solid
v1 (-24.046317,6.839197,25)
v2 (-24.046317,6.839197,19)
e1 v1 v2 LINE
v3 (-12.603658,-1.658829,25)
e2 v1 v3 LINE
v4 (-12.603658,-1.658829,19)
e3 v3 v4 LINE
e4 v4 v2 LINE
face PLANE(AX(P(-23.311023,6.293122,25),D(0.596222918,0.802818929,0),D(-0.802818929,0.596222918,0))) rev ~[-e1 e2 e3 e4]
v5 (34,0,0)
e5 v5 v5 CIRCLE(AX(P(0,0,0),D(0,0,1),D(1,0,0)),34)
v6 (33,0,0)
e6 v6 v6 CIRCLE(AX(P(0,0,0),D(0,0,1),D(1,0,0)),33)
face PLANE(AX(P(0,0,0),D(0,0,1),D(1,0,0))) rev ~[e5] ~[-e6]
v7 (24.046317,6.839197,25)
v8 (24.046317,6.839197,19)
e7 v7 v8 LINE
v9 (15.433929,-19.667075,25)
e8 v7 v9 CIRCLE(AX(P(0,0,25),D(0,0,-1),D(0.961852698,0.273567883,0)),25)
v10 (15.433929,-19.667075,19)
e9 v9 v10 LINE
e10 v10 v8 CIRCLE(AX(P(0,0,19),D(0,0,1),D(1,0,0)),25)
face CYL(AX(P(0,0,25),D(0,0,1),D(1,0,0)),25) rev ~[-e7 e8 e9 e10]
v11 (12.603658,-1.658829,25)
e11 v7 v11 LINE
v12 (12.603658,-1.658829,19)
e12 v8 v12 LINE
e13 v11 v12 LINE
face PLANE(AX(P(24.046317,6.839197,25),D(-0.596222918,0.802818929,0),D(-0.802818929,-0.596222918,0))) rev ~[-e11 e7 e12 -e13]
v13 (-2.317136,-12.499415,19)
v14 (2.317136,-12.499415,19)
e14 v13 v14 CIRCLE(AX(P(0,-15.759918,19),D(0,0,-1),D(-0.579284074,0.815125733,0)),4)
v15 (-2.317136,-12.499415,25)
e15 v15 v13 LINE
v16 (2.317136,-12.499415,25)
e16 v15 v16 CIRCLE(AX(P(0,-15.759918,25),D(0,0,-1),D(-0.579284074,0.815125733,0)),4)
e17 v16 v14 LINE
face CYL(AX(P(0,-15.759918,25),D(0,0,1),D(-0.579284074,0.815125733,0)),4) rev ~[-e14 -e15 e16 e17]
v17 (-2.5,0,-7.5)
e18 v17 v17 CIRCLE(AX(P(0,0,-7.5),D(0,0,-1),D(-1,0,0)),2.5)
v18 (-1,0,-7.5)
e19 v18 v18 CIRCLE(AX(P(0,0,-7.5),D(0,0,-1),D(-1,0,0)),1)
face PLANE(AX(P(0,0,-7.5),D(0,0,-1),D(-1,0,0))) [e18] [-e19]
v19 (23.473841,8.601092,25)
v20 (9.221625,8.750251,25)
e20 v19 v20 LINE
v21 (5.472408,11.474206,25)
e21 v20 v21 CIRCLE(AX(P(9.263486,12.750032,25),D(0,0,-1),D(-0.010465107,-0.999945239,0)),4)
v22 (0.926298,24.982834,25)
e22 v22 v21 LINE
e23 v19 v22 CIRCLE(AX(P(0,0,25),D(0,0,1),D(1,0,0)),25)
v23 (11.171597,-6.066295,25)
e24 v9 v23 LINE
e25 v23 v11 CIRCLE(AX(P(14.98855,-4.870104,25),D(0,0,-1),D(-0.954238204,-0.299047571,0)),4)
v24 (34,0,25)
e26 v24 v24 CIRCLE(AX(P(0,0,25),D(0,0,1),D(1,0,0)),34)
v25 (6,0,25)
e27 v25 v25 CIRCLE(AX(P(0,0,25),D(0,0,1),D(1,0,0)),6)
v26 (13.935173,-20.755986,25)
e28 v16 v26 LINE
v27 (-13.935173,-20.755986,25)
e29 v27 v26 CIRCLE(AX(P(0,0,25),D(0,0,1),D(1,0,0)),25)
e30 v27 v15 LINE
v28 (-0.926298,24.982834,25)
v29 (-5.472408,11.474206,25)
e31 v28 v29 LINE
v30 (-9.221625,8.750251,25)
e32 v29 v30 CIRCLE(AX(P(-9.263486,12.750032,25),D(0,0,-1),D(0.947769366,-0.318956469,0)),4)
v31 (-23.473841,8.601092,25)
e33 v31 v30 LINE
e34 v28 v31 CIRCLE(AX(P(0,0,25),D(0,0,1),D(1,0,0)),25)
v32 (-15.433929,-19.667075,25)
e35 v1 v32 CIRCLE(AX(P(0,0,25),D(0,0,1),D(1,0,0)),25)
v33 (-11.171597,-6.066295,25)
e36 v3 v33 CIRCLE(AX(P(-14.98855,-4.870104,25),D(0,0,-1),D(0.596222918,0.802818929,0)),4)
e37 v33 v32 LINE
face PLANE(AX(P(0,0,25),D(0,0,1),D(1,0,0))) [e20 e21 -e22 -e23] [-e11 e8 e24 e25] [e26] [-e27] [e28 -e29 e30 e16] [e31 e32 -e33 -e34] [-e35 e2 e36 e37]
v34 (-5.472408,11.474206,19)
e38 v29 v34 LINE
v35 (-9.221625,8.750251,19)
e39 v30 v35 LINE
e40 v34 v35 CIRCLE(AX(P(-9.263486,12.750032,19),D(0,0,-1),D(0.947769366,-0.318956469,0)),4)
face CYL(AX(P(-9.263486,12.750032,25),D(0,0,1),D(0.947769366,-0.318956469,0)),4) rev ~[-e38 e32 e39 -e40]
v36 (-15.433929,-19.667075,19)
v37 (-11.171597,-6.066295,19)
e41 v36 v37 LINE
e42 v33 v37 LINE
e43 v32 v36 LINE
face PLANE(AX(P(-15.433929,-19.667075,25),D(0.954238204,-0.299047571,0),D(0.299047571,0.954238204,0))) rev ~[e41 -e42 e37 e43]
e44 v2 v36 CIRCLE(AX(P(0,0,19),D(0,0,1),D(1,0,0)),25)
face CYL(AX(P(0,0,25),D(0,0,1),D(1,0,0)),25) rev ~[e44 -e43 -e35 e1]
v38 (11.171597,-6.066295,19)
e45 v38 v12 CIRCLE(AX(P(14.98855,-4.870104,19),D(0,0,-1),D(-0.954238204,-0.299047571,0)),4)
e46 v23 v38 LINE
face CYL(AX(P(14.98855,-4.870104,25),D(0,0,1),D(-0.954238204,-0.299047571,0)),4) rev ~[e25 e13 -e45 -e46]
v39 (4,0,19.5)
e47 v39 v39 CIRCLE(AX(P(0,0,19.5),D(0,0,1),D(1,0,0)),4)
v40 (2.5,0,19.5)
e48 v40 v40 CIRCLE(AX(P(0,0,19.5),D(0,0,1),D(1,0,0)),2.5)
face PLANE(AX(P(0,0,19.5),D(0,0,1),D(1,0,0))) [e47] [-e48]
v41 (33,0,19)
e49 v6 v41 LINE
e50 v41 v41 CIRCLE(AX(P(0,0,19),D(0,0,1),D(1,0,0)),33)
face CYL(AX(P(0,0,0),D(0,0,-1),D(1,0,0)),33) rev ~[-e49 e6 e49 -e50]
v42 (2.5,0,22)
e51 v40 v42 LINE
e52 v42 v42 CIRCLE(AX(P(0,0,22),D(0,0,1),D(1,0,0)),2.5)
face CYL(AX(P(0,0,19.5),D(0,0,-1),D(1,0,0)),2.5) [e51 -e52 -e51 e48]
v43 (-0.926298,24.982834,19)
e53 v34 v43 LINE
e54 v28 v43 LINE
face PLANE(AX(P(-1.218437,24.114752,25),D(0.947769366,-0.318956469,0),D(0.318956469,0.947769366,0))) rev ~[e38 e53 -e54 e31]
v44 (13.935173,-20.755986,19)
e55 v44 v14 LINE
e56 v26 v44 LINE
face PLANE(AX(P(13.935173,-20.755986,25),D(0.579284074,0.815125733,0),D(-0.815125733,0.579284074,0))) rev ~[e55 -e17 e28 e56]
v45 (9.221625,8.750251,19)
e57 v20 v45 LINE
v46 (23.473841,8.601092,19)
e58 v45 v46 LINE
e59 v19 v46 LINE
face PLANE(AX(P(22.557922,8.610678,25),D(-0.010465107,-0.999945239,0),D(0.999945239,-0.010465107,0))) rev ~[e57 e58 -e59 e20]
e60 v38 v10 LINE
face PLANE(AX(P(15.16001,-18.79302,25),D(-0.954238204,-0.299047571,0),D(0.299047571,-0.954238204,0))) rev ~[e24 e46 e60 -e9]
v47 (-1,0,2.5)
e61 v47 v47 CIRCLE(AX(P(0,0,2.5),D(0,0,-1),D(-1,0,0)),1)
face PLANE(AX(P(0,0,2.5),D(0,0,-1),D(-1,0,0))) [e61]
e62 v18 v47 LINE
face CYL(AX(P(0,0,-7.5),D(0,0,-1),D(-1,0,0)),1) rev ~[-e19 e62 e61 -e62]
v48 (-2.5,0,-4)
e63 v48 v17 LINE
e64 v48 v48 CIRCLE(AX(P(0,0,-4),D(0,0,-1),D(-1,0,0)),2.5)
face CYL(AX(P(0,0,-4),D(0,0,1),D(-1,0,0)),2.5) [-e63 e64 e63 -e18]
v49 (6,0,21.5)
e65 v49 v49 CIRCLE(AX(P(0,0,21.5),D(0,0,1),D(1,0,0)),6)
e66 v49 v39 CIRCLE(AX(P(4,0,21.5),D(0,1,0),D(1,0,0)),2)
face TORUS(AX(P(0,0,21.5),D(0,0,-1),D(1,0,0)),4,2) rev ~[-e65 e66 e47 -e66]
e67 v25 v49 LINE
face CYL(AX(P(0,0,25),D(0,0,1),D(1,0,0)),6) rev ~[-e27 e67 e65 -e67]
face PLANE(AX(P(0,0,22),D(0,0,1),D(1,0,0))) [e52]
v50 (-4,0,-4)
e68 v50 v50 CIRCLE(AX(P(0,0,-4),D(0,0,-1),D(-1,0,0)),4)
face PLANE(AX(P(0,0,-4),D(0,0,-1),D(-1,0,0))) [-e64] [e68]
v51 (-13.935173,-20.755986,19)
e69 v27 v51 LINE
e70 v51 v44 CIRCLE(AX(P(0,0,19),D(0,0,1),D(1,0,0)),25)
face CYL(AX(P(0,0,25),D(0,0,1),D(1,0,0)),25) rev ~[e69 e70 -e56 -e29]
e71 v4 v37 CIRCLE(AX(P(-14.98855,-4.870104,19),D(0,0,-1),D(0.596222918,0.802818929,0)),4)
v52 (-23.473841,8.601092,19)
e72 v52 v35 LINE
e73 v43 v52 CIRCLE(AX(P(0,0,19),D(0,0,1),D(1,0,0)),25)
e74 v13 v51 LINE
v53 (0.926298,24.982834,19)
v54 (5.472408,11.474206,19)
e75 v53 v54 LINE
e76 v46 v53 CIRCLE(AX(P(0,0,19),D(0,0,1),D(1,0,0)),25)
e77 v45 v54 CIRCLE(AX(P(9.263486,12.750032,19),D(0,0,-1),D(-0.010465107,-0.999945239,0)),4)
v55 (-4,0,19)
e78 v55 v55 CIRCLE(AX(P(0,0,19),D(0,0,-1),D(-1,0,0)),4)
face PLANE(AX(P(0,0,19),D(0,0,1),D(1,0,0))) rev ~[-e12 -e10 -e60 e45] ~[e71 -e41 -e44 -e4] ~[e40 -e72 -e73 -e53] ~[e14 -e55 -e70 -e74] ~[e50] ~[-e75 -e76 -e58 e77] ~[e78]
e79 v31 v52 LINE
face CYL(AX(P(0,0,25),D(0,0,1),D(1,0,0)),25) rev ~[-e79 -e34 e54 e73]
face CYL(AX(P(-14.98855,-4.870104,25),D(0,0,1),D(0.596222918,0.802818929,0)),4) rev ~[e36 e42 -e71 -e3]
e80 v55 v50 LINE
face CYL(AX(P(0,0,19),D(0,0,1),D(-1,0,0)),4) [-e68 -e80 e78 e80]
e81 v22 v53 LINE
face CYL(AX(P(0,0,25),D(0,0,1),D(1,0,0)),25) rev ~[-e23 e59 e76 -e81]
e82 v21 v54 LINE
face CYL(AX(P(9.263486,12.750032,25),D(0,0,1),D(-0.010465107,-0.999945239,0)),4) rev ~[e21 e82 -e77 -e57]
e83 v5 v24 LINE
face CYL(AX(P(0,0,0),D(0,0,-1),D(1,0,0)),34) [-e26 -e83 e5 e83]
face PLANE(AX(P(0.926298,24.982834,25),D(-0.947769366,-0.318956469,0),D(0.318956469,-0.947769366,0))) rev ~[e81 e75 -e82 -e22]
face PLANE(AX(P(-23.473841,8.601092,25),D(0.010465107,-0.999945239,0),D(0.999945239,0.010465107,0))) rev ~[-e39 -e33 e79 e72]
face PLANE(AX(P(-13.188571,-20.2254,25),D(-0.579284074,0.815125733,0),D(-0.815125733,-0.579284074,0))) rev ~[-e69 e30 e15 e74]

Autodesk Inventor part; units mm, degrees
ref_plane "YZ Plane" through (0, 0, 0) normal (1, 0, 0) x (0, 1, 0)
ref_plane "XZ Plane" through (0, 0, 0) normal (0, 1, 0) x (-1, 0, 0)
ref_plane "XY Plane" through (0, 0, 0) normal (0, 0, 1) x (1, 0, 0)
sketch "Эскиз1" plane through (0, 0, 0) normal (0, 0, 1) x (1, 0, 0)
  circle A0 centre (0, 0) radius 34
  circle A1 centre (0, 0) radius 33
  dimension "d0" = 68
  dimension "d1" = 66
extrude "Выдавливание1" add sketch "Эскиз1" along normal blind 25
sketch "Эскиз4" plane through (0, 0, 25) normal (0, 0, 1) x (1, 0, 0)
  circle A0 centre (0, 0) radius 33
extrude "Выдавливание2" add sketch "Эскиз4" against normal blind 6
sketch "Эскиз5" plane through (0, 0, 25) normal (0, 0, 1) x (1, 0, 0)
  circle A0 centre (0, 0) radius 25
  line L0 (0, 25) -> (23.7764, 7.7254)
  line L1 (23.7764, 7.7254) -> (14.6946, -20.2254)
  line L2 (14.6946, -20.2254) -> (-14.6946, -20.2254)
  line L3 (-14.6946, -20.2254) -> (-23.7764, 7.7254)
  line L4 (-23.7764, 7.7254) -> (0, 25)
  circle A1 centre (0, 0) radius 11
  line L5 (0, 25) -> (-4.9275, 9.8346)
  line L6 (0, 25) -> (4.9275, 9.8346)
  line L7 (23.7764, 7.7254) -> (7.8306, 7.7254)
  line L8 (23.7764, 7.7254) -> (10.876, -1.6473)
  line L9 (14.6946, -20.2254) -> (9.7671, -5.06)
  line L10 (14.6946, -20.2254) -> (1.7942, -10.8527)
  line L11 (-14.6946, -20.2254) -> (-1.7942, -10.8527)
  line L12 (-14.6946, -20.2254) -> (-9.7671, -5.06)
  line L13 (-7.8306, 7.7254) -> (-23.7764, 7.7254)
  line L14 (-10.876, -1.6473) -> (-23.7764, 7.7254)
  line L15 (4.9275, 9.8346) -> (9.7671, -5.06)
  line L16 (10.876, -1.6473) -> (-1.7942, -10.8527)
  line L17 (1.7942, -10.8527) -> (-10.876, -1.6473)
  line L18 (-9.7671, -5.06) -> (-4.9275, 9.8346)
  line L19 (-7.8306, 7.7254) -> (7.8306, 7.7254)
  line L20 (-7.8306, 7.7254) -> (-4.9275, 9.8346)
  line L21 (-6.3791, 8.78) -> (0, 27.7353)
  line L22 (4.9275, 9.8346) -> (7.8306, 7.7254)
  line L23 (10.876, -1.6473) -> (9.7671, -5.06)
  line L24 (1.7942, -10.8527) -> (-1.7942, -10.8527)
  line L25 (-9.7671, -5.06) -> (-10.876, -1.6473)
  line L26 (0, 27.7353) -> (6.3791, 8.78)
  line L27 (-10.3215, -3.3537) -> (-26.3778, 8.5707)
  line L28 (-26.3778, 8.5707) -> (-6.3791, 8.78)
  line L29 (0, -10.8527) -> (-16.3024, -22.4383)
  line L30 (-16.3024, -22.4383) -> (-10.3215, -3.3537)
  line L31 (10.3215, -3.3537) -> (16.3024, -22.4383)
  line L32 (16.3024, -22.4383) -> (0, -10.8527)
  line L33 (6.3791, 8.78) -> (26.3778, 8.5707)
  line L34 (26.3778, 8.5707) -> (10.3215, -3.3537)
  point P0 (23.7764, 7.7254)
  point P1 (23.7764, 7.7254)
  point P2 (-15.4339, -19.6671)
  point P3 (-10.3966, -3.5932)
  point P4 (-10.523, -3.204)
  point P5 (-24.0463, 6.8392)
  point P6 (0.2046, -10.9981)
  point P7 (-0.2046, -10.9981)
  point P8 (-13.9352, -20.756)
  point P9 (13.9352, -20.756)
  point P10 (10.523, -3.204)
  point P11 (10.3966, -3.5932)
  point P12 (15.4339, -19.6671)
  point P13 (24.0463, 6.8392)
  point P14 (23.4738, 8.6011)
  point P15 (0.9263, 24.9828)
  point P16 (6.299, 9.0179)
  point P17 (6.63, 8.7774)
  point P18 (-23.4738, 8.6011)
  point P19 (-6.63, 8.7774)
  point P20 (-6.299, 9.0179)
  point P21 (-0.9263, 24.9828)
  dimension "d8" = 22
  dimension "d7" = 50
  dimension "d15" = 360
extrude "Выдавливание3" cut sketch "Эскиз5" against normal through all contours A0 L31 L1 L34 | L1 L31 A1 L34 | L33 L0 L26 A0 | L33 A1 L26 L0 | A0 L29 L2 L32 | L2 L29 A1 L32 | L21 L4 L28 A0 | L21 A1 L28 L4 | A0 L27 L3 L30 | L3 L27 A1 L30
fillet "Сопряжение1" radius 4 10 edges at (6.299, 9.0179, 22) (6.63, 8.7774, 22) (10.523, -3.204, 22) (10.3966, -3.5932, 22) (0.2046, -10.9981, 22) (-0.2046, -10.9981, 22) (-10.523, -3.204, 22) (-10.3966, -3.5932, 22) (-6.299, 9.0179, 22) (-6.63, 8.7774, 22)
sketch "Эскиз6" plane through (0, 0, 25) normal (0, 0, 1) x (1, 0, 0)
  circle A0 centre (0, 0) radius 6
  dimension "d18" = 12
extrude "Выдавливание4" cut sketch "Эскиз6" against normal blind 5.5
sketch "Эскиз7" plane through (0, 0, 19.5) normal (0, 0, 1) x (1, 0, 0)
  circle A0 centre (0, 0) radius 2.5
  dimension "d21" = 5
extrude "Выдавливание5" add sketch "Эскиз7" along normal blind 2.5
fillet "Сопряжение2" radius 2 1 edges at (-6, 0, 19.5)
sketch "Эскиз8" plane through (0, 0, 19) normal (0, 0, -1) x (-1, 0, 0)
  circle A0 centre (0, 0) radius 4 projected
  circle A1 centre (0, 0) radius 4.5
  dimension "d25" = 9
extrude "Выдавливание6" add sketch "Эскиз8" along normal blind 23 contours A0
sketch "Эскиз9" plane through (0, 0, -4) normal (0, 0, -1) x (-1, 0, 0)
  circle A0 centre (0, 0) radius 2.5
  dimension "d28" = 5
extrude "Выдавливание7" add sketch "Эскиз9" along normal blind 3.5
sketch "Эскиз10" plane through (0, 0, -7.5) normal (0, 0, -1) x (-1, 0, 0)
  circle A0 centre (0, 0) radius 1
  dimension "d31" = 2
extrude "Выдавливание8" cut sketch "Эскиз10" against normal blind 10
properties part number "Колесо красивое"
